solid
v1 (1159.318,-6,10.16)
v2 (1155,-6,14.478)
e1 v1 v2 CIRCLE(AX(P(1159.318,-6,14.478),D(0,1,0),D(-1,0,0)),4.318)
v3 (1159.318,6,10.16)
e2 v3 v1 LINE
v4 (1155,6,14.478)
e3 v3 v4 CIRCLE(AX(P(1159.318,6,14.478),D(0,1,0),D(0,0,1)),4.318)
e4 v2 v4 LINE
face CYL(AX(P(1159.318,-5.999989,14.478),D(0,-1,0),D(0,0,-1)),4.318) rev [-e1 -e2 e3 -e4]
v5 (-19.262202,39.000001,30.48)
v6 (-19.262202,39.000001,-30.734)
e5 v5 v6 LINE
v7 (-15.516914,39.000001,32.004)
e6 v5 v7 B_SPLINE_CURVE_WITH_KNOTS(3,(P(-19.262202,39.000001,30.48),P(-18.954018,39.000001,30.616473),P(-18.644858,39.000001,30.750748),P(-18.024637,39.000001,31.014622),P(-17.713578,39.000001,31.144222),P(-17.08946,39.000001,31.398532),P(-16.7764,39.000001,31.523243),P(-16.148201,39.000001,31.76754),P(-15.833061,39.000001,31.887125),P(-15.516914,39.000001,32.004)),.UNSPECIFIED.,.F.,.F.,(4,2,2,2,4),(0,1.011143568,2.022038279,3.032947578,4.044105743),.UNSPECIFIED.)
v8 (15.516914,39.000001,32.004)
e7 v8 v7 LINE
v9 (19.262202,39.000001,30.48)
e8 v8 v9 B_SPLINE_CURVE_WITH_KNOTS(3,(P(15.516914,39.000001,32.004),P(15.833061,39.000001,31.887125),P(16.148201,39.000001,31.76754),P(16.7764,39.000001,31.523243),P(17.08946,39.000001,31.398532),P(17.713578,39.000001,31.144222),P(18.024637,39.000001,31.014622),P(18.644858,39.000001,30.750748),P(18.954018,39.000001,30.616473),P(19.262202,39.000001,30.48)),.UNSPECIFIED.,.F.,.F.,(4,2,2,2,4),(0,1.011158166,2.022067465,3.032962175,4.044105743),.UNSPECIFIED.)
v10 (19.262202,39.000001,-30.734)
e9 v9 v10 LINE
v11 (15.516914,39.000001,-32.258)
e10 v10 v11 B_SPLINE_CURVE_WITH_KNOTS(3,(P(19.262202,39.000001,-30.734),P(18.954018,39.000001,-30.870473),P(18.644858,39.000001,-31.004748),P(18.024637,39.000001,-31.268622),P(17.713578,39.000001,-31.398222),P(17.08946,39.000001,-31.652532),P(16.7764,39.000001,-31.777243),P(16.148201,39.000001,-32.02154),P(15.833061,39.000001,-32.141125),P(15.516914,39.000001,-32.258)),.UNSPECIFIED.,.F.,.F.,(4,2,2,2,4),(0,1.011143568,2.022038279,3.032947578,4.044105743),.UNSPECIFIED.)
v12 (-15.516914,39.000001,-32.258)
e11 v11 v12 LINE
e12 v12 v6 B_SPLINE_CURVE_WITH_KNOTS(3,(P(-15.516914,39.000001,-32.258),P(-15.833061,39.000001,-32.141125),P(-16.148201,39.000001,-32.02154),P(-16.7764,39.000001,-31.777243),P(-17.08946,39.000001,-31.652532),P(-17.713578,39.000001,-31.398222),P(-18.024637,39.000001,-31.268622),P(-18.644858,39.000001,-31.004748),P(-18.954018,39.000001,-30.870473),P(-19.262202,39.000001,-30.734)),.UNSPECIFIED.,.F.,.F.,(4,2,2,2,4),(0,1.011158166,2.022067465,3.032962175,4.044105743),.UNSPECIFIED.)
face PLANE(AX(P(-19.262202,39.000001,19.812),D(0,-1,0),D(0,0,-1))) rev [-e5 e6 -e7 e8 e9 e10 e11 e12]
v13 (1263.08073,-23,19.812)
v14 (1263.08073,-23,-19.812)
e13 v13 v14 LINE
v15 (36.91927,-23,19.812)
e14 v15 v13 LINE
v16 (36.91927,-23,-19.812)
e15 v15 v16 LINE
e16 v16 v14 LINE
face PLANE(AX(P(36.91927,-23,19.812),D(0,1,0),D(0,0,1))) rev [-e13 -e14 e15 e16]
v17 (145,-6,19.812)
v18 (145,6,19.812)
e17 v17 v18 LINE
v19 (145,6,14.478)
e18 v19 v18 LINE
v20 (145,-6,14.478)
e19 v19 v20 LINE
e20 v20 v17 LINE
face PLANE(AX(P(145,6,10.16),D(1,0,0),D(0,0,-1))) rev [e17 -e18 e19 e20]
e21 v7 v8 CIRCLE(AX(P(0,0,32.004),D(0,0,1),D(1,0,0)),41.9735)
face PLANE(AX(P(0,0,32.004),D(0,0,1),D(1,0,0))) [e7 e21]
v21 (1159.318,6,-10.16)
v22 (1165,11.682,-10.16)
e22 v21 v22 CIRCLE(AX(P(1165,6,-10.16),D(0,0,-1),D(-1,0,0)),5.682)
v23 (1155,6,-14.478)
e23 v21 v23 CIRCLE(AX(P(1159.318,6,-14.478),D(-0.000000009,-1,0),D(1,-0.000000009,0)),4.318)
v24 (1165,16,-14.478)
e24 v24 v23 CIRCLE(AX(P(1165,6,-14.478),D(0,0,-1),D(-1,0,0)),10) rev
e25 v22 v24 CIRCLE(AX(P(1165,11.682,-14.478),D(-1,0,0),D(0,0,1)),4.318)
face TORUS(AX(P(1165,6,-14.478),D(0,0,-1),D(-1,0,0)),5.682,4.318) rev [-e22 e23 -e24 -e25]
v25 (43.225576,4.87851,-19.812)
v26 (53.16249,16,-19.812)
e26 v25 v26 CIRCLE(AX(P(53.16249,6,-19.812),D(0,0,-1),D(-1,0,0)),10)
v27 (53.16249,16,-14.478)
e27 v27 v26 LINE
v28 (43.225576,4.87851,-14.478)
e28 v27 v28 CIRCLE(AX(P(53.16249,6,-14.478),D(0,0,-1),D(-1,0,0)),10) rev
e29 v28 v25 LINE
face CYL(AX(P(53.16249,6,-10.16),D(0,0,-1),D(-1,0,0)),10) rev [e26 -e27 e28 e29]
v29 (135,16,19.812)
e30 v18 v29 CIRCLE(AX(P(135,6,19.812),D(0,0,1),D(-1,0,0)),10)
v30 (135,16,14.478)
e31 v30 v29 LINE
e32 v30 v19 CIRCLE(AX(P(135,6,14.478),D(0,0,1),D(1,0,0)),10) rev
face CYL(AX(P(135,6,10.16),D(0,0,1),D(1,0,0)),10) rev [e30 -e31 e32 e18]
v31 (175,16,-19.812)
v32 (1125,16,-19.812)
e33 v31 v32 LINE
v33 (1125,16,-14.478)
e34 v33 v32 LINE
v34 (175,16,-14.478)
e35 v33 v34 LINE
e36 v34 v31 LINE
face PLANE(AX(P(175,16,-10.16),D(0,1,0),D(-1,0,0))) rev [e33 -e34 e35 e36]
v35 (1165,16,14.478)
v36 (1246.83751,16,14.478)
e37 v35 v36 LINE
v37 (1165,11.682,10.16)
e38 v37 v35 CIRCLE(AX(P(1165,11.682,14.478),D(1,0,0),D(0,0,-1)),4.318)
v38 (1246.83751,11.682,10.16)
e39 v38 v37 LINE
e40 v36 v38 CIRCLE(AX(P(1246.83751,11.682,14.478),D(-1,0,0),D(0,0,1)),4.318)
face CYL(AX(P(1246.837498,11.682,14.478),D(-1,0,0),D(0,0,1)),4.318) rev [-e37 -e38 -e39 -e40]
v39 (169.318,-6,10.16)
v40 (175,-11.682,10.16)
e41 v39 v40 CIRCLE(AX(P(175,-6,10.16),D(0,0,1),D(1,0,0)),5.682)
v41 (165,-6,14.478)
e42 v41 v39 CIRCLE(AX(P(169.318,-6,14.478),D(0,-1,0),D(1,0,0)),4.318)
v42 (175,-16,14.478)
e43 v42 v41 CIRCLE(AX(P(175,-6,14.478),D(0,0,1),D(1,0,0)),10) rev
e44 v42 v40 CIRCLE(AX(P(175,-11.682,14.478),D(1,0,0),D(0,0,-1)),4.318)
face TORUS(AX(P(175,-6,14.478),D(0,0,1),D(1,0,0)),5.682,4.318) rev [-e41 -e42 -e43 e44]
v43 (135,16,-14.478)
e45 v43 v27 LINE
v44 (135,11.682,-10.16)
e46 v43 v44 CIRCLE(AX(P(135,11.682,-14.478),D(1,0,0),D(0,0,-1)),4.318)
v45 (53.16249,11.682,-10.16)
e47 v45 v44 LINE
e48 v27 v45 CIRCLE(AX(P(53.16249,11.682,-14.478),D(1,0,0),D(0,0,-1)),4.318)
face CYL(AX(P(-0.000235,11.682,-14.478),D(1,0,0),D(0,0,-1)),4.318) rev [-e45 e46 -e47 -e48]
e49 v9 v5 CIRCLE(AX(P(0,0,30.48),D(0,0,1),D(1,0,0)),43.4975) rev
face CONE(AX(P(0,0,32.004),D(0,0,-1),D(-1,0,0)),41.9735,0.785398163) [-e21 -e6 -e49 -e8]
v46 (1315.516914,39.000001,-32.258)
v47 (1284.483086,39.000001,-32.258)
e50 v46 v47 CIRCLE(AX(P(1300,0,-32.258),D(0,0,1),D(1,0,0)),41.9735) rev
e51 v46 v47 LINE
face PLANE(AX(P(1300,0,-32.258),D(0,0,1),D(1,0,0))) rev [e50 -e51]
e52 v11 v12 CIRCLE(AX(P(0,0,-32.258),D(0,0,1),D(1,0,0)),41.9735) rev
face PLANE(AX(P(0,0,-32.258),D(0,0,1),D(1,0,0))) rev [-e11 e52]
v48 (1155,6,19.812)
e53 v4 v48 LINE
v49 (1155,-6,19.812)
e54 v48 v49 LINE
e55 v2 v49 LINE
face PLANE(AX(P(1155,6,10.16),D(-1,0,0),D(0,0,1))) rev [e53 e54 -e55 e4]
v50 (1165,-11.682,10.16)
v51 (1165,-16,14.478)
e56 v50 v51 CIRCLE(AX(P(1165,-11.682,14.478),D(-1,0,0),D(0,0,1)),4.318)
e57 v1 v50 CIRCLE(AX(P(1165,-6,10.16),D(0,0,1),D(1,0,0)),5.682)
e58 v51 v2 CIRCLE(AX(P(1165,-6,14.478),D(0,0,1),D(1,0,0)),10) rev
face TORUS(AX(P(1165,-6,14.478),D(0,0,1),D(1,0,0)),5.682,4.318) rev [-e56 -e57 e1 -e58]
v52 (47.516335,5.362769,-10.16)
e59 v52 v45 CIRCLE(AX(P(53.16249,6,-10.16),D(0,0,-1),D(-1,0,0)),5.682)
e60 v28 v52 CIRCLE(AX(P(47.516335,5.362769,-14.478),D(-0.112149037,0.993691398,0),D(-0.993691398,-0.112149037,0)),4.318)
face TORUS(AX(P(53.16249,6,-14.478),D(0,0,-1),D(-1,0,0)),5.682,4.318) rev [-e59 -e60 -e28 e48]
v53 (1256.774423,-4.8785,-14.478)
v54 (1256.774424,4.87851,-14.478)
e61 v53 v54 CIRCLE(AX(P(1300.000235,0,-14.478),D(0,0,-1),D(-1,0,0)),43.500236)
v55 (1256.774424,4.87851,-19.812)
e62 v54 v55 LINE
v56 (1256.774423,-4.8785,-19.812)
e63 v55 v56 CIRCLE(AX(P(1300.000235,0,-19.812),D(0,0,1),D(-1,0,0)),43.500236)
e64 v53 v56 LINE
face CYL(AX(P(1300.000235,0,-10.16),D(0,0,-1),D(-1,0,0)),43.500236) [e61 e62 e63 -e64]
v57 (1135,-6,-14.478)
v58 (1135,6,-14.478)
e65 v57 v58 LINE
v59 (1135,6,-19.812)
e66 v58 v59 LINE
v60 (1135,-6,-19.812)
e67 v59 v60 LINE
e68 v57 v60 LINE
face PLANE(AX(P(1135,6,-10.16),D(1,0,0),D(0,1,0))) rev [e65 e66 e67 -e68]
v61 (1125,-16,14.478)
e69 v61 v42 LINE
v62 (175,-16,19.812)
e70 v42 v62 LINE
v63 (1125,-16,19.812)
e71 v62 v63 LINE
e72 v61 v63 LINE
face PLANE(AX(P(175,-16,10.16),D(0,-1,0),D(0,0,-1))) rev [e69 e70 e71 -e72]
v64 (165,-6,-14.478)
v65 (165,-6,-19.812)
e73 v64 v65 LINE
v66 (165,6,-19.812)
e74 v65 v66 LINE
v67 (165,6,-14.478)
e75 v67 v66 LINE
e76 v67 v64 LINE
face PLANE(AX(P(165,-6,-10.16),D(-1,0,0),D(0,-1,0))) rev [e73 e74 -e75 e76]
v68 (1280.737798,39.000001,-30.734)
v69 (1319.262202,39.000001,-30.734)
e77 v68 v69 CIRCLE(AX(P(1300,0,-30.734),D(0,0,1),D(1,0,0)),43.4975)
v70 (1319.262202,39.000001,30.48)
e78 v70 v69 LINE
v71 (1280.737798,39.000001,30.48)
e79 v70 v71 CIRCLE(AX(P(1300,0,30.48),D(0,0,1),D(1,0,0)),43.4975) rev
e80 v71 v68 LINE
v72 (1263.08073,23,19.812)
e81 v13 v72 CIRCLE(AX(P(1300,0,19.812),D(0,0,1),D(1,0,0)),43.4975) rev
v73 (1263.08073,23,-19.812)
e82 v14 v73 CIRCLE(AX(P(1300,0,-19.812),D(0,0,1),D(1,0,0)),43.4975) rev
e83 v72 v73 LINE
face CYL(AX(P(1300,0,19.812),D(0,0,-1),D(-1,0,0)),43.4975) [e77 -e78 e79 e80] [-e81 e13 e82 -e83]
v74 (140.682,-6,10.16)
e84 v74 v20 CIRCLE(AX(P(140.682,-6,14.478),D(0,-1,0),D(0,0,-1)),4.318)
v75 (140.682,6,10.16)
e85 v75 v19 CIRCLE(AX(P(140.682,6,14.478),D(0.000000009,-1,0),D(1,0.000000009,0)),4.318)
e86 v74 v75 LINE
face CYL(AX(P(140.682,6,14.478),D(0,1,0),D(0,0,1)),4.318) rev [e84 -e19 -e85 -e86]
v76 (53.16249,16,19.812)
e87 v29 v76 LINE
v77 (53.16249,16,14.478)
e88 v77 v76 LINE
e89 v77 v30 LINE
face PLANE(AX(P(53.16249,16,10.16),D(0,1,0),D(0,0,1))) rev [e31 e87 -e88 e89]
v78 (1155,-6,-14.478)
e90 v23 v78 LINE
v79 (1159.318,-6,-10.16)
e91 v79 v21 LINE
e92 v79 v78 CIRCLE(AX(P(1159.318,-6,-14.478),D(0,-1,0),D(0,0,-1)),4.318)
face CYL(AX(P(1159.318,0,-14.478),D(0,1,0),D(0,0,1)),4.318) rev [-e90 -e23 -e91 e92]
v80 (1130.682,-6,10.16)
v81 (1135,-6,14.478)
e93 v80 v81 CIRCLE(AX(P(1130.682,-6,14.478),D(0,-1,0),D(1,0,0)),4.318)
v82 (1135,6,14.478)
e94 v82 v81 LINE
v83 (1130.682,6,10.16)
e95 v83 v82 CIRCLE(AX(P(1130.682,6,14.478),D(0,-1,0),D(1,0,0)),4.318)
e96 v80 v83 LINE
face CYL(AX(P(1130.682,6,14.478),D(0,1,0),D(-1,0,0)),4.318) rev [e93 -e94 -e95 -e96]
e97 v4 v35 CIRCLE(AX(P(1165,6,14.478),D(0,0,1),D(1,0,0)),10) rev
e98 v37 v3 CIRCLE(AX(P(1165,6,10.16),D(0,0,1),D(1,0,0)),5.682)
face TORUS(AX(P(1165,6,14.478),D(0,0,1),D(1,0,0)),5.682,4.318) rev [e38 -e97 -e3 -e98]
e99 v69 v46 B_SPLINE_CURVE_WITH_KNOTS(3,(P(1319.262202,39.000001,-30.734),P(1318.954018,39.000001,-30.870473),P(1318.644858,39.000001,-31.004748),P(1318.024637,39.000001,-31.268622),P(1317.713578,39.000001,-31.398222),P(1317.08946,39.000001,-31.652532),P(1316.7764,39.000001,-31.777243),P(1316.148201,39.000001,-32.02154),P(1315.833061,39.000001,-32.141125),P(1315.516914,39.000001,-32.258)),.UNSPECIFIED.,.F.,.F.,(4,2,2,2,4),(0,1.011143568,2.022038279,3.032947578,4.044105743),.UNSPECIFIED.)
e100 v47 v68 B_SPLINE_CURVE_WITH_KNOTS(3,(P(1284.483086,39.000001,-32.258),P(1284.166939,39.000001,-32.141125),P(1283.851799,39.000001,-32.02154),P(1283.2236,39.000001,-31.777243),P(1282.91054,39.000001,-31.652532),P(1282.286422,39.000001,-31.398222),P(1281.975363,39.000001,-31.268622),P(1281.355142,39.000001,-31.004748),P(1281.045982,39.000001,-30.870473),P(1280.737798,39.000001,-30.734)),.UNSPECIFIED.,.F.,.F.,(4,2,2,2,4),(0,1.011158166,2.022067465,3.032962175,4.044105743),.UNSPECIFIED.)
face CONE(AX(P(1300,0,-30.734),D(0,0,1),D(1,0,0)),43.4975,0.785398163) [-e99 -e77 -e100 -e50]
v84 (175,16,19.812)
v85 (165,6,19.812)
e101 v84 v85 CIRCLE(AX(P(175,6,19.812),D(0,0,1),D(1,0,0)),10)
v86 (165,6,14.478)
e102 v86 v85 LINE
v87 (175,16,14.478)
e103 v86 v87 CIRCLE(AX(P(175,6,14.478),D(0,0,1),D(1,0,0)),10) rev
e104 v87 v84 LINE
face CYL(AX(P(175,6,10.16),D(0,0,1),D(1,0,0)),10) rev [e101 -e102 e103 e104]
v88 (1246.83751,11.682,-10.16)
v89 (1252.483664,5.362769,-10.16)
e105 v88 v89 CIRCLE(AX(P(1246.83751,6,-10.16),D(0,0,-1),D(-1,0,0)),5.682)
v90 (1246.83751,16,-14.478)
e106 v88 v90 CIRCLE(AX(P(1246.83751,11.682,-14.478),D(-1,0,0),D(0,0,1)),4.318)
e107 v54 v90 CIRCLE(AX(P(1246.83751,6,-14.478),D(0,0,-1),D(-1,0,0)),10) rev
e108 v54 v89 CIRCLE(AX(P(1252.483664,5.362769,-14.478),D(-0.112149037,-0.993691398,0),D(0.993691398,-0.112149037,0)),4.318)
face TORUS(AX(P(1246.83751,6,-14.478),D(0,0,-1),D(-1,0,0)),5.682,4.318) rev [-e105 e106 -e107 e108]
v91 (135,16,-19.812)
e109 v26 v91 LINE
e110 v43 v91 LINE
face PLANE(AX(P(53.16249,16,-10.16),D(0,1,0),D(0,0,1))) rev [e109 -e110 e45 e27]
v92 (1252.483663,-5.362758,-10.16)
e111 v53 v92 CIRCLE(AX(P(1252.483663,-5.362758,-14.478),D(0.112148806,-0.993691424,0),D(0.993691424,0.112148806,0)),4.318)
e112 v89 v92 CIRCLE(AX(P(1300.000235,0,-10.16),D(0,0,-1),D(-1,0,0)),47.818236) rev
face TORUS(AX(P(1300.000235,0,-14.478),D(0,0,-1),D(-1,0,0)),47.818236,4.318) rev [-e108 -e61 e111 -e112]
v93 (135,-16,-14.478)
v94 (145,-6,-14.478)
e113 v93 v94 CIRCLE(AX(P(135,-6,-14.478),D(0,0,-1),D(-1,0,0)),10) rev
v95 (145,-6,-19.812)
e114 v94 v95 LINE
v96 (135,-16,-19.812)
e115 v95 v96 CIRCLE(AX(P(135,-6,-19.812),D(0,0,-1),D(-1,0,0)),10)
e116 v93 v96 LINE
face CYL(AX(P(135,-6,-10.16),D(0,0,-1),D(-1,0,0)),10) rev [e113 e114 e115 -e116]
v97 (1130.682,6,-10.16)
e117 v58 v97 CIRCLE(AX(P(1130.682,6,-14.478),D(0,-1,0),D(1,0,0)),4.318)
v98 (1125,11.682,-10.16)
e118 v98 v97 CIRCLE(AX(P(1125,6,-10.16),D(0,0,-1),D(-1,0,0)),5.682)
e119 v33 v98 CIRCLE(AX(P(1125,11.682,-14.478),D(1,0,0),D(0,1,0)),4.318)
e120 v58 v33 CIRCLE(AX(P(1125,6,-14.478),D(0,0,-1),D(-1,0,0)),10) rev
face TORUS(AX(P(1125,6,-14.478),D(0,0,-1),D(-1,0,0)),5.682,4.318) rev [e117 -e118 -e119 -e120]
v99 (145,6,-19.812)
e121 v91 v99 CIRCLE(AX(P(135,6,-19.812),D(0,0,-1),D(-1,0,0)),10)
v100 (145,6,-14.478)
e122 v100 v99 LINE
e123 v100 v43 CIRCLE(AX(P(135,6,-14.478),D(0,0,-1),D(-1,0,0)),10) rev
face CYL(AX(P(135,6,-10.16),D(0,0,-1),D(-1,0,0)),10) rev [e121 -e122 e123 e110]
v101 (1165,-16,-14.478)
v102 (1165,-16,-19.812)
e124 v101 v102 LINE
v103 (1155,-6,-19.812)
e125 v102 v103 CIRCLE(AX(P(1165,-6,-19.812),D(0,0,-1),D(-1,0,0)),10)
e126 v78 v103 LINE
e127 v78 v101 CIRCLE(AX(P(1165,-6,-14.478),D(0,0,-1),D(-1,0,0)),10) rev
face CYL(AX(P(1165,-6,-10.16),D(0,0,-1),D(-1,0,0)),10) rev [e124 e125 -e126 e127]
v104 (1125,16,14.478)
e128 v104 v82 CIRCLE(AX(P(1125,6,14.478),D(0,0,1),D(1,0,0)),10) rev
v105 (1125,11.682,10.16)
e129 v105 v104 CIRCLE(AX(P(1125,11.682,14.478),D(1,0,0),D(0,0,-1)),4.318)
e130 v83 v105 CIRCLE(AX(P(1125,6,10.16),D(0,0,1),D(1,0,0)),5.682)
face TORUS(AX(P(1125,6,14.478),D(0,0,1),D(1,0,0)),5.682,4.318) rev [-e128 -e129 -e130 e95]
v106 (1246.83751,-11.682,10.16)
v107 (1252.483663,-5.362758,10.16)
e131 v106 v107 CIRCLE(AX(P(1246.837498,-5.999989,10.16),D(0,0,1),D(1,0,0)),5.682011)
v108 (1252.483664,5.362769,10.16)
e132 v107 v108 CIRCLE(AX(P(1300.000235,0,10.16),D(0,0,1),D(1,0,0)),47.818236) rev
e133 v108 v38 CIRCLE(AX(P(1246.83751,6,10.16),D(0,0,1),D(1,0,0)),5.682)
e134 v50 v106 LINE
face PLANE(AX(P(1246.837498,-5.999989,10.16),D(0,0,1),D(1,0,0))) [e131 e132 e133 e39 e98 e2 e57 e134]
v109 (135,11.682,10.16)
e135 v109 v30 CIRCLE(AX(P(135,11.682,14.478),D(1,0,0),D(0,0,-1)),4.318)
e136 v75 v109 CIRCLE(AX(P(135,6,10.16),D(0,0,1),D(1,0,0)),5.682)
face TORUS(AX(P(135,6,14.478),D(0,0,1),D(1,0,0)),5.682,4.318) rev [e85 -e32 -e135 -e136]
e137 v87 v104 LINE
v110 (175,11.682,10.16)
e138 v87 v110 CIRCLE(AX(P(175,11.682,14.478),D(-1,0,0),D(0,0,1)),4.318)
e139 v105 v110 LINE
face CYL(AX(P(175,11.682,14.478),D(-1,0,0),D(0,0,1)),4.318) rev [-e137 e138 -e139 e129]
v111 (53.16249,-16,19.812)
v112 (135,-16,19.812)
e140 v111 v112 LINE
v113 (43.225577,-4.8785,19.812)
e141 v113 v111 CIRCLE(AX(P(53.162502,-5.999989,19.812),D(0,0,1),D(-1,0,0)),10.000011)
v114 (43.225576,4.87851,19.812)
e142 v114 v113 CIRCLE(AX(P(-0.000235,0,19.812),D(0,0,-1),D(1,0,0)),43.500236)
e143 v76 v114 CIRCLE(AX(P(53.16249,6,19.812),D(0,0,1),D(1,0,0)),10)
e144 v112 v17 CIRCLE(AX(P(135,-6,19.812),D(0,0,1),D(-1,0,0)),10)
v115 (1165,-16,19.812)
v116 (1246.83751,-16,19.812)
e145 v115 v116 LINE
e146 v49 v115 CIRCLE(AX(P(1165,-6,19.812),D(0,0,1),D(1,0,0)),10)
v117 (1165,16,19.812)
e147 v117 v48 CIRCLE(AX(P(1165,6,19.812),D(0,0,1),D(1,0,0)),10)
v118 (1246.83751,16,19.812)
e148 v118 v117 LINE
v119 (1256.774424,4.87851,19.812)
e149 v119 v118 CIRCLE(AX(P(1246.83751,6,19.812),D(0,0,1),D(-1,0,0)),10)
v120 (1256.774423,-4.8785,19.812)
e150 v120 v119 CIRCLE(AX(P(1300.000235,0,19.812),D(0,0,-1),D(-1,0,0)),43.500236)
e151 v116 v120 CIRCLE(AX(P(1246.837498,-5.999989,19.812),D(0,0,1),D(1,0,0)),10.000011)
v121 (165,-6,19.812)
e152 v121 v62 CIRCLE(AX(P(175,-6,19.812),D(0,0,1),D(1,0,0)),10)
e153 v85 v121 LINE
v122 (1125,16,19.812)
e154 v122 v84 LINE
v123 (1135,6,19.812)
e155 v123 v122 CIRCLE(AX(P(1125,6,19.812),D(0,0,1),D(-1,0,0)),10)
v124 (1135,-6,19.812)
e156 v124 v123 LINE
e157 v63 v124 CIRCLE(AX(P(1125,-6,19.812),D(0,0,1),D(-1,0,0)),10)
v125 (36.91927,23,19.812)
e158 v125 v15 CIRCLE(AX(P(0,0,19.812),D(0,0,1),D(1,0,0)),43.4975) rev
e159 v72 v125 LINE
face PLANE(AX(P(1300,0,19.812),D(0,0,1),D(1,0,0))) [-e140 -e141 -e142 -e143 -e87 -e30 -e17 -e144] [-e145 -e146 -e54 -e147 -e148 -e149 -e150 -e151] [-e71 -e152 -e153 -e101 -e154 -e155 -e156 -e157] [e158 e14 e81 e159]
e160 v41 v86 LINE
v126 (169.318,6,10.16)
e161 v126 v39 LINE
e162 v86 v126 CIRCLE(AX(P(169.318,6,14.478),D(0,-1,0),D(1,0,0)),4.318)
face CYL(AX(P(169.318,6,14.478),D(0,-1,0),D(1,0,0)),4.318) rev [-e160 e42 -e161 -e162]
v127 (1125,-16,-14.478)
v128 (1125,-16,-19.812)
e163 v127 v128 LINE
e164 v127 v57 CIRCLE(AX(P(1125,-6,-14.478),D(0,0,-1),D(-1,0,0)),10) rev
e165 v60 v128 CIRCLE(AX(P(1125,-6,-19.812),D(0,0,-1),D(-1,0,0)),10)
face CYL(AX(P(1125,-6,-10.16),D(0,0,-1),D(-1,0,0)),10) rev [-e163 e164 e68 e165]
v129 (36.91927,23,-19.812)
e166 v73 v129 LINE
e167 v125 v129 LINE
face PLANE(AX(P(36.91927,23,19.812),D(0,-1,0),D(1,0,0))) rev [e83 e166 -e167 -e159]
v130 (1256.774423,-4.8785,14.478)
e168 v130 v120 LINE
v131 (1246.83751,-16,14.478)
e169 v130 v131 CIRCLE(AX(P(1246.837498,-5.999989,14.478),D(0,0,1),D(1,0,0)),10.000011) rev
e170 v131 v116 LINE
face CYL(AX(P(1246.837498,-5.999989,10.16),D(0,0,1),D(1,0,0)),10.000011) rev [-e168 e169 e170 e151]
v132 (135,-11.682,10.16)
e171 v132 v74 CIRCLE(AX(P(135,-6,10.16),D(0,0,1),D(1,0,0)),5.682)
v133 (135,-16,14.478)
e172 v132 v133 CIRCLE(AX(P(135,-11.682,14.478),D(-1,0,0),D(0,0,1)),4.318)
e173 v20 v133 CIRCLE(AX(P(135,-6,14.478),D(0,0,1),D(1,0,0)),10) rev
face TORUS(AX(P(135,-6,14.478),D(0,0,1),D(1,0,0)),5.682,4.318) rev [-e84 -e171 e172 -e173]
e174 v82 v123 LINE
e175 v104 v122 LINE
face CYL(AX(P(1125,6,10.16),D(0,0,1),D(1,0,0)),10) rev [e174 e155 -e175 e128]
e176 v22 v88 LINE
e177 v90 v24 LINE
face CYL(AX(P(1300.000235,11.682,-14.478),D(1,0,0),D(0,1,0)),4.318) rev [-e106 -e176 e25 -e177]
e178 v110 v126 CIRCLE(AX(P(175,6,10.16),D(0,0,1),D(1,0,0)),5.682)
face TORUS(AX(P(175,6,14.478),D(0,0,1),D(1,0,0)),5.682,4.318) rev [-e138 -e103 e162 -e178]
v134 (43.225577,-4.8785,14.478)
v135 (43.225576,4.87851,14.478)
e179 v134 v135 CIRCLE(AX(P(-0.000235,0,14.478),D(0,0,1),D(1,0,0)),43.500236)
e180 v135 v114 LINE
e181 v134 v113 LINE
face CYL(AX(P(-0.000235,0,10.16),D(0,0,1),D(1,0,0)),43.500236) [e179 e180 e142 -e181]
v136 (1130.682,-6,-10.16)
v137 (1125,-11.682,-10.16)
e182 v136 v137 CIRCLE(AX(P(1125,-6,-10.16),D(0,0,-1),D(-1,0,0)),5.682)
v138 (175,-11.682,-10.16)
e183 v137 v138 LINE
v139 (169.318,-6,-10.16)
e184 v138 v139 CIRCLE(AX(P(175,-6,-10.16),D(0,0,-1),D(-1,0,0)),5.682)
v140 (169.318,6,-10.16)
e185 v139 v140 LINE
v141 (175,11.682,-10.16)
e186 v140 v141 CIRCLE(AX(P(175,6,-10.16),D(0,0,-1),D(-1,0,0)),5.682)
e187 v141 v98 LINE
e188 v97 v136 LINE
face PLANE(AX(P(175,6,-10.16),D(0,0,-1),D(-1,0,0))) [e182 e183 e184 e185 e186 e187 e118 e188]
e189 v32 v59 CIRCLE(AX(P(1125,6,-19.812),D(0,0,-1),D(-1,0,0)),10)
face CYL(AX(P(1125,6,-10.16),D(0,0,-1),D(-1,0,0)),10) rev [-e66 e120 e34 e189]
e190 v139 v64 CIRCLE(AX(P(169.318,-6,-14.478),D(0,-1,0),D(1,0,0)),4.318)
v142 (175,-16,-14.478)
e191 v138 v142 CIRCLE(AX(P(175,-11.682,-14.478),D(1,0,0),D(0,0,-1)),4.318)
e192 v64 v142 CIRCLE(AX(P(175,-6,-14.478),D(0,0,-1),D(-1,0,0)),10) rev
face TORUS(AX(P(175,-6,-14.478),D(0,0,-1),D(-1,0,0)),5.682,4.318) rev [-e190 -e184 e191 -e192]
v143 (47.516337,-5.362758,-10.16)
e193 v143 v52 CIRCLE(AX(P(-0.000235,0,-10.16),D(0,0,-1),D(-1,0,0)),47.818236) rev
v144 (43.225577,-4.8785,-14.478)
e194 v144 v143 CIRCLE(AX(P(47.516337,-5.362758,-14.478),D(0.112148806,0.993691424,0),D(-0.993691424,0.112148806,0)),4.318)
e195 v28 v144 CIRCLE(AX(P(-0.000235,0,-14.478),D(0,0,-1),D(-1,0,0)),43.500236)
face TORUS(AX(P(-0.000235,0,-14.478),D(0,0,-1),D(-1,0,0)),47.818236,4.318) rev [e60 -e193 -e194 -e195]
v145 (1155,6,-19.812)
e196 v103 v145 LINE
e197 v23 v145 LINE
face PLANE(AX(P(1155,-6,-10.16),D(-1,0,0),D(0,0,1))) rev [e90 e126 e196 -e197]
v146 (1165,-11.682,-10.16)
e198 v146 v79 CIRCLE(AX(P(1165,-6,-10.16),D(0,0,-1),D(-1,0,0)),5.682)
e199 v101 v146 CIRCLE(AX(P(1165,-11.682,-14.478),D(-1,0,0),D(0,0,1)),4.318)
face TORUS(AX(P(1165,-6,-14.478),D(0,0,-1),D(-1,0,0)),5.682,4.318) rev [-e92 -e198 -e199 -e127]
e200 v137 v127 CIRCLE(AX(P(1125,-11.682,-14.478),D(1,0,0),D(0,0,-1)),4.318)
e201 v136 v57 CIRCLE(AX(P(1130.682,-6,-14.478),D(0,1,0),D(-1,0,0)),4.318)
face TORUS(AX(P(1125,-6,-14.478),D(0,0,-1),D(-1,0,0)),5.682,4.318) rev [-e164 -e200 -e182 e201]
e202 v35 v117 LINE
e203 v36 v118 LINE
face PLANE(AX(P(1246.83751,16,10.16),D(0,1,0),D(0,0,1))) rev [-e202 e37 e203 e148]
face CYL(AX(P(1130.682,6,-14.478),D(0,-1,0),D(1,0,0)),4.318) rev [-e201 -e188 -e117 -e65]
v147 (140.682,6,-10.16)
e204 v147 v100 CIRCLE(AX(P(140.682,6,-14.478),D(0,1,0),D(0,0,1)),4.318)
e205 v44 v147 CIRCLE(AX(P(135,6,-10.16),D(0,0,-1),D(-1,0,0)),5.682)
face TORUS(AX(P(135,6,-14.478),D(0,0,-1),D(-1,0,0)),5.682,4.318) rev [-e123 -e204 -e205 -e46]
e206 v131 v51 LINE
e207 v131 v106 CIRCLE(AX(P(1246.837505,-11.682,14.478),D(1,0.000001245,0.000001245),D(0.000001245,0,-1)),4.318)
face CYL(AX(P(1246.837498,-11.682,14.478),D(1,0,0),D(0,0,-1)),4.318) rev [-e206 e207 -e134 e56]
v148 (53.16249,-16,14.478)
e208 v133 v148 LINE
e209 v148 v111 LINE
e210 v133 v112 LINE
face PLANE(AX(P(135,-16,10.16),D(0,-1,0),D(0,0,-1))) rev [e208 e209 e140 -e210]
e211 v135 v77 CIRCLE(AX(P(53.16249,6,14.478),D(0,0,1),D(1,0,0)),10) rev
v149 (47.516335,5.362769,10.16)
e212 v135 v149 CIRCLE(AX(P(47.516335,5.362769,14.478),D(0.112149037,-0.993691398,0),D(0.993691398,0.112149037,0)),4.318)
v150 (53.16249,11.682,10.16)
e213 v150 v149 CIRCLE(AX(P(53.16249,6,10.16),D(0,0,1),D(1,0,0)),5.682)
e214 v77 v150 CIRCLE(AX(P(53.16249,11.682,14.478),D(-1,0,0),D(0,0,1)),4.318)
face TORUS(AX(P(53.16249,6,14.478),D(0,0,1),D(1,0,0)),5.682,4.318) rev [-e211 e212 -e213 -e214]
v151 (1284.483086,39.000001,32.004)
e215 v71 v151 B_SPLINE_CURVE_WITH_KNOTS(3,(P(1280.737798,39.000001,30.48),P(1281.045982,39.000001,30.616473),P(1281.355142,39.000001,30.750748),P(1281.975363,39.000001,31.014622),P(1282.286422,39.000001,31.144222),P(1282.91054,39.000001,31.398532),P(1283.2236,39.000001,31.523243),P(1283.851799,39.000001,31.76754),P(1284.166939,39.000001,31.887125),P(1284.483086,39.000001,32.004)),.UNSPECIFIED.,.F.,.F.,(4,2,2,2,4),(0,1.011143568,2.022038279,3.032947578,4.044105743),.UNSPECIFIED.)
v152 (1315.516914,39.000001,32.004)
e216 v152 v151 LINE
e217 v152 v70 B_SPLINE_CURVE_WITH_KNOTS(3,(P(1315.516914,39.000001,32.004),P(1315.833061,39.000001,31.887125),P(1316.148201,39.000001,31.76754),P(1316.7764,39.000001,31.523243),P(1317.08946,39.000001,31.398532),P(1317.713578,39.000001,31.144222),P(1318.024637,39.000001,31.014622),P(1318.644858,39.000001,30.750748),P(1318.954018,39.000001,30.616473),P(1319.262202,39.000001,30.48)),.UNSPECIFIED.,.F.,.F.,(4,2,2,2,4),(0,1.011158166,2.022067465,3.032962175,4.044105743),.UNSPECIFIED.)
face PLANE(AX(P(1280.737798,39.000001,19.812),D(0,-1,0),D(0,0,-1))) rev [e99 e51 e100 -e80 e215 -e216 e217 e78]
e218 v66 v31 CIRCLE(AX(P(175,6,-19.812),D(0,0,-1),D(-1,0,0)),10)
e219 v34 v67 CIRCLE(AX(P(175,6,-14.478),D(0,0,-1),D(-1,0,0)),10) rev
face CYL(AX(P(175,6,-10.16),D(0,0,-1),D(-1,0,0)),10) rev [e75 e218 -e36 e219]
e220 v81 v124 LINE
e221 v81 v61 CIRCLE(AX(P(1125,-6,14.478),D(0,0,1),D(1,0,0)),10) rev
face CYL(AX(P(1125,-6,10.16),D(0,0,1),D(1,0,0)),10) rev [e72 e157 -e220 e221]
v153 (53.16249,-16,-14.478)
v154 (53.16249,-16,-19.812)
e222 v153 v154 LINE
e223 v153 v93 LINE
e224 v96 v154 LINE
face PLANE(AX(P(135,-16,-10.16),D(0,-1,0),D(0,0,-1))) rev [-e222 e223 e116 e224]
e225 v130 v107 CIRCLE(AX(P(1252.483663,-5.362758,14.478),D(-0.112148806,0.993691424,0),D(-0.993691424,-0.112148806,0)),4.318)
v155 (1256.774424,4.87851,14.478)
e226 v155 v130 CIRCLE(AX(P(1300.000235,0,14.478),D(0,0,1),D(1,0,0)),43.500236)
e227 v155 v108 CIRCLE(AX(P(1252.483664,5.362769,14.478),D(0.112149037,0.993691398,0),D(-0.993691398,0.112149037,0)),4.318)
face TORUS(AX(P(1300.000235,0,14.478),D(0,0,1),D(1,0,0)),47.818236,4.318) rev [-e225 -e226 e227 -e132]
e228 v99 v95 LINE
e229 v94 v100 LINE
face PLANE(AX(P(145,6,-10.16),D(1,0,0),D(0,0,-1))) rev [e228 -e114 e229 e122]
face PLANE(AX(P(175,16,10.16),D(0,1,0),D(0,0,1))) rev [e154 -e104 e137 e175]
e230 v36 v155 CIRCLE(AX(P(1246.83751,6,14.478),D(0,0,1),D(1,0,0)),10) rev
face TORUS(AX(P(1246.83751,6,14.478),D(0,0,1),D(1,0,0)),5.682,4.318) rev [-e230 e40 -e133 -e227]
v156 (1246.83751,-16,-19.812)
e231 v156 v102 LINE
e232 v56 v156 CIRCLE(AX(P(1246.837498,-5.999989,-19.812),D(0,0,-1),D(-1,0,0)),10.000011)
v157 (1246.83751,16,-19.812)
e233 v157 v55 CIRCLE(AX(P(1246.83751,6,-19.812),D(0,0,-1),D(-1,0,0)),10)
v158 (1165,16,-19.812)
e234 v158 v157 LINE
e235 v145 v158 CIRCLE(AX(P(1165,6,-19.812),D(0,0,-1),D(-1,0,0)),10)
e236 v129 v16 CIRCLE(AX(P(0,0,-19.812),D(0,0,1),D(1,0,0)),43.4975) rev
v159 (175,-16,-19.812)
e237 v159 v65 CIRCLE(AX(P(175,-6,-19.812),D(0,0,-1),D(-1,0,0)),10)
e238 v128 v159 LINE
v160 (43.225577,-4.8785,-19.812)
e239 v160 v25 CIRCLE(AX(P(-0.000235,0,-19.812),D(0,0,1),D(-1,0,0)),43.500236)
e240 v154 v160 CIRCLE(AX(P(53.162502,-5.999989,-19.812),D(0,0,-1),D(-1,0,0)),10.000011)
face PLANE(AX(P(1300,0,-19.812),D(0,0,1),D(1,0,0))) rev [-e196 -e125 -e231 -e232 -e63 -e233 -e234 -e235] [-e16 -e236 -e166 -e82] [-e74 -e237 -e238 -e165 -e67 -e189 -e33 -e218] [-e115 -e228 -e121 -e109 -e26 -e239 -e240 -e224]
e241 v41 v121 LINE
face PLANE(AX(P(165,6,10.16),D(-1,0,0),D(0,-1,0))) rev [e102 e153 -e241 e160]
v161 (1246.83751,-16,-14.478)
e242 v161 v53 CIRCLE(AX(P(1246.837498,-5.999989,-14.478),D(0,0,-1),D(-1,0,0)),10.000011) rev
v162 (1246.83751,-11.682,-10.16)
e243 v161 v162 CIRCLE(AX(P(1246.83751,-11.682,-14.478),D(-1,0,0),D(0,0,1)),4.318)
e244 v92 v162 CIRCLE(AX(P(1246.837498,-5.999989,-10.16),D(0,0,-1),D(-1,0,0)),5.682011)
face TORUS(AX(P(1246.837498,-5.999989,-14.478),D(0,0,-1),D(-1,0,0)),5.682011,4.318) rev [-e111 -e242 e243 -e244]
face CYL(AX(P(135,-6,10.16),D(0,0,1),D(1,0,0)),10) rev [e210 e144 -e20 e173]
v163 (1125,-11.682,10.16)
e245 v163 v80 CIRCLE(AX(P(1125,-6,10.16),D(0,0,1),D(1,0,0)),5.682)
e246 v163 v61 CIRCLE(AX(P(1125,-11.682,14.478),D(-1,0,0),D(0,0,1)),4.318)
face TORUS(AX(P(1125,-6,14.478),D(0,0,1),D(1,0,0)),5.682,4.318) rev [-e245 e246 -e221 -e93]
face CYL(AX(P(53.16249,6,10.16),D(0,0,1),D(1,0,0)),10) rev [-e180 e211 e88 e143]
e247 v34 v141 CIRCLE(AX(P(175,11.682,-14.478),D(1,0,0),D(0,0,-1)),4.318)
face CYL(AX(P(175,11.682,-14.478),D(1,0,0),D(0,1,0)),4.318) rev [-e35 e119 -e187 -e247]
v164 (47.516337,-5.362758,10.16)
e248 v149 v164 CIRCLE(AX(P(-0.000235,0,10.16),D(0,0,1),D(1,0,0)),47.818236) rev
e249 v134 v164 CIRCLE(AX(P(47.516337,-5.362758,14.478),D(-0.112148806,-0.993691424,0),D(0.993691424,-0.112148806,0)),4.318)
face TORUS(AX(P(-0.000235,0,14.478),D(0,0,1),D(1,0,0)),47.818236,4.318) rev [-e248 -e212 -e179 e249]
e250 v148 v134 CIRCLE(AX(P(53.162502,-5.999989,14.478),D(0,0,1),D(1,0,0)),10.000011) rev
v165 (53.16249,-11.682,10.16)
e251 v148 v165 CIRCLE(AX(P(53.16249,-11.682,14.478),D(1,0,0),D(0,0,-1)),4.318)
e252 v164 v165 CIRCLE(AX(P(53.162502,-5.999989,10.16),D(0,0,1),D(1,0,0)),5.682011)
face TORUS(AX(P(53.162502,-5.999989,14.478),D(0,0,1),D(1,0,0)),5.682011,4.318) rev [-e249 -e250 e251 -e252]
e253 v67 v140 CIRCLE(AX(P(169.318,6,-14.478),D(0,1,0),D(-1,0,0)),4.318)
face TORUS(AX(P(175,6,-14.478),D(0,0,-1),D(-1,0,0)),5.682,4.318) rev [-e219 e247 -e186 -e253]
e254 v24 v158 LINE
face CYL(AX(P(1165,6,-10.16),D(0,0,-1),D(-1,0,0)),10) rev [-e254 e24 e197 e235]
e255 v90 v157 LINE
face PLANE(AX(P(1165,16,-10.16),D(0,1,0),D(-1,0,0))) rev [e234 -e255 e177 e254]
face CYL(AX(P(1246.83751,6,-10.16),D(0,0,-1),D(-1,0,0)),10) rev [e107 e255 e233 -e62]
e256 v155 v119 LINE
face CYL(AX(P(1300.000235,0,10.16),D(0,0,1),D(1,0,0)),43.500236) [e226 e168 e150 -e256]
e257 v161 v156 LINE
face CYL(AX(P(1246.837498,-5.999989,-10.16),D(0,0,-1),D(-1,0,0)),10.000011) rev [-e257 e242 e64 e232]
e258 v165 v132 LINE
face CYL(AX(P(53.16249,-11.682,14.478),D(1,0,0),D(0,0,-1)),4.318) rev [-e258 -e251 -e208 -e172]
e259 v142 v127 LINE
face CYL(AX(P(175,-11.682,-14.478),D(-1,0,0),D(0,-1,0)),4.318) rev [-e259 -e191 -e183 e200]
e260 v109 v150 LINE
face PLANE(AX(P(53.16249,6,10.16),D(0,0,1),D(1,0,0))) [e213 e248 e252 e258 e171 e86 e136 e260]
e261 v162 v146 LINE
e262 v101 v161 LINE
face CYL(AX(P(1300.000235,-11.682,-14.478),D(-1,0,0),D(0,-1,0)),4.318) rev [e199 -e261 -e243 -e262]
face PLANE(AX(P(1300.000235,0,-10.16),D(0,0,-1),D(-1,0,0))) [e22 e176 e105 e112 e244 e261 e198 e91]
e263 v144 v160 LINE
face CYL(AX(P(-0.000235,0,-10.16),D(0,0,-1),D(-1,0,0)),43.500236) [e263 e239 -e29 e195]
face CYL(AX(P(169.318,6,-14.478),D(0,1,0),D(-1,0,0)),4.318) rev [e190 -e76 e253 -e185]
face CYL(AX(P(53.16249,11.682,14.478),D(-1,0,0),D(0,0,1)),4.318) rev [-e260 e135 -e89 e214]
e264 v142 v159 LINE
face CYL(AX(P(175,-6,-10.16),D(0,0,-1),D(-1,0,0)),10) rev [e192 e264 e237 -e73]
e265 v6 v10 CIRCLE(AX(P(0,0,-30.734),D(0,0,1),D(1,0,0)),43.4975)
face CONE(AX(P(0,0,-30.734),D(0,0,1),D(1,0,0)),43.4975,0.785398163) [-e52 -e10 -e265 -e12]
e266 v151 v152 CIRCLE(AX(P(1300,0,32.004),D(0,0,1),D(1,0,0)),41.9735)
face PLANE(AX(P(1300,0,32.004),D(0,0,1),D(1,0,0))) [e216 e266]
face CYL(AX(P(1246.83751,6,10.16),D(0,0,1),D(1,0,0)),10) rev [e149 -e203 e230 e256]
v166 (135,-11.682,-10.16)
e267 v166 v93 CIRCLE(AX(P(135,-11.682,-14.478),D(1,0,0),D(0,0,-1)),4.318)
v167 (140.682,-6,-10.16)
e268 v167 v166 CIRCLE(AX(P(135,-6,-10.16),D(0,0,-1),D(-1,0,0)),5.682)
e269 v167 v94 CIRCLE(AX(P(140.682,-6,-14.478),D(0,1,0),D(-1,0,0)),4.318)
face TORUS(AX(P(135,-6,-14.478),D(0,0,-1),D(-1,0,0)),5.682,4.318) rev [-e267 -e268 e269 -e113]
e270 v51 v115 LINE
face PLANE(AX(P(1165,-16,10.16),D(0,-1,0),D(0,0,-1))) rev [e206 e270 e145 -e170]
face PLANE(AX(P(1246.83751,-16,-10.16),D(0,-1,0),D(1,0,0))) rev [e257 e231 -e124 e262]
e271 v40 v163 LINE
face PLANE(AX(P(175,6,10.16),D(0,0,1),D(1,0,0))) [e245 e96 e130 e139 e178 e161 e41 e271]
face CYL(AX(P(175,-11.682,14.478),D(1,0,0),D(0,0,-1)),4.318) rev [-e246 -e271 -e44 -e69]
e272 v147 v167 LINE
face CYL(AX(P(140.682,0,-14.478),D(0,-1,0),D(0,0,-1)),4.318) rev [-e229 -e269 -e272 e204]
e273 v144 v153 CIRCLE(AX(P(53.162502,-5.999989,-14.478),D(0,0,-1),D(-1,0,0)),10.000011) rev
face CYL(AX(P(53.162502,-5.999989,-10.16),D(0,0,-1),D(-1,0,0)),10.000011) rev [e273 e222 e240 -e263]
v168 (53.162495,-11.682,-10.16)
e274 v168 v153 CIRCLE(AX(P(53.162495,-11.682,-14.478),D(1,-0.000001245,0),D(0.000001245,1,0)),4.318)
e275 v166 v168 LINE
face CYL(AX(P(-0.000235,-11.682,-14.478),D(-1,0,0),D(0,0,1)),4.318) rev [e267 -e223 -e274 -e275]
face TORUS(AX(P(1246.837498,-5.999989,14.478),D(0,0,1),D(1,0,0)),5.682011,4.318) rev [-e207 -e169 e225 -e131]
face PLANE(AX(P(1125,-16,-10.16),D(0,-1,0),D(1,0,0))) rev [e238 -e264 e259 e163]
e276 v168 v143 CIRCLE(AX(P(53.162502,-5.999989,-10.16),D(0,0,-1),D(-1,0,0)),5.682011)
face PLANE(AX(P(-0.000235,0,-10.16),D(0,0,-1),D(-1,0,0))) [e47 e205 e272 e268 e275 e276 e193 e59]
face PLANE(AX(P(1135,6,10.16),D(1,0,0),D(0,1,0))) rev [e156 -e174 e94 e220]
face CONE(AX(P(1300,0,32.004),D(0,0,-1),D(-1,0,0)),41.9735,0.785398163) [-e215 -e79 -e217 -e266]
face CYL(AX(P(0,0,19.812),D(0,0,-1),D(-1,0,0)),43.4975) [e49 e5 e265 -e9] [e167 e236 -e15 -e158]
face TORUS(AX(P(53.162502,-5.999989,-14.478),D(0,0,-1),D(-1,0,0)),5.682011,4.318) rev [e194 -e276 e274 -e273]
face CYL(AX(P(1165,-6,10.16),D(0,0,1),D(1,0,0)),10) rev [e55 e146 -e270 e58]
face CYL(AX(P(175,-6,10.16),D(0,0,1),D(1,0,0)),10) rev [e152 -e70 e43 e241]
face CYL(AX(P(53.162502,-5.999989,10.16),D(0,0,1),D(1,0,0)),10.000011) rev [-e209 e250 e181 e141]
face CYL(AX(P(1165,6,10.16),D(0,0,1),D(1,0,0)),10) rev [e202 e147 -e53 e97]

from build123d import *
from build123d.topology import SkipClean

# Parameters (mm, degrees)
EXTRUDE1_DEPTH      = 19.812
EXTRUDE1_DEPTH_BACK = 19.812
CUT_EXTRUDE1_DEPTH  = 9.652
CUT_EXTRUDE2_START  = -9.652
CUT_EXTRUDE2_DEPTH  = 9.652
EXTRUDE2_DEPTH      = 12.192
EXTRUDE2_DEPTH_BACK = 52.07
CHAMFER1_SIZE       = 1.524
FILLET1_R           = 4.318


with BuildPart() as part:
    # Sketch3 → Extrude1 (new, two sides: drawn at the far end of the back side and taken through both)
    with BuildSketch(Plane.XY.offset(-EXTRUDE1_DEPTH_BACK)):
        with BuildLine():
            Line((-19.262201877, 39.000001091), (19.262201877, 39.000001091))
            ThreePointArc((19.262201877, 39.000001091), (29.207695203, 32.232639469), (36.919270155, 22.999999944))
            Line((36.919270155, 22.999999944), (1263.080729845, 22.999999944))
            ThreePointArc((1263.080729845, 22.999999944), (1270.792304797, 32.232639469), (1280.737798123, 39.000001091))
            Line((1280.737798123, 39.000001091), (1319.262201877, 39.000001091))
            ThreePointArc((1319.262201877, 39.000001091), (1332.232639491, -29.207695179), (1263.080729879, -23))
            Line((1263.080729879, -23), (36.919270121, -23))
            ThreePointArc((36.919270121, -23), (-32.232639491, -29.207695179), (-19.262201877, 39.000001091))
        make_face()
    extrude(amount=EXTRUDE1_DEPTH + EXTRUDE1_DEPTH_BACK)

    # Sketch4 → Cut-Extrude1 (cut)
    with BuildSketch(Plane.XY.offset(19.812)):
        with BuildLine():
            Line((53.16249, 15.999999944), (134.999999965, 15.999999944))
            ThreePointArc((134.999999965, 15.999999944), (142.07106777, 13.071067778), (145, 6))
            Line((145, 6), (145, -6))
            ThreePointArc((145, -6), (142.071067812, -13.071067812), (135, -16))
            Line((135, -16), (53.16249, -16))
            ThreePointArc((53.16249, -16), (45.705450362, -12.662765822), (43.22557716, -4.878499573))
            ThreePointArc((43.22557716, -4.878499573), (43.500001722, 5.034e-06), (43.225576025, 4.878509576))
            ThreePointArc((43.225576025, 4.878509576), (45.705449579, 12.662773253), (53.16249, 15.999999944))
        make_face()
        with BuildLine():
            Line((165, 6), (165, -6))
            ThreePointArc((165, -6), (167.928932188, -13.071067812), (175, -16))
            Line((175, -16), (1124.999999965, -16))
            ThreePointArc((1124.999999965, -16), (1132.071067777, -13.071067812), (1134.999999965, -6))
            Line((1134.999999965, -6), (1134.999999965, 6))
            ThreePointArc((1134.999999965, 6), (1132.071067777, 13.071067812), (1124.999999965, 16))
            Line((1124.999999965, 16), (175, 16))
            ThreePointArc((175, 16), (167.928932188, 13.071067812), (165, 6))
        make_face()
        with BuildLine():
            Line((1164.999999965, -16), (1246.837509965, -16))
            ThreePointArc((1246.837509965, -16), (1254.294549604, -12.662765822), (1256.774422805, -4.878499573))
            ThreePointArc((1256.774422805, -4.878499573), (1256.499998243, 5.034e-06), (1256.774423941, 4.878509576))
            ThreePointArc((1256.774423941, 4.878509576), (1254.294550386, 12.662773253), (1246.837509965, 15.999999944))
            Line((1246.837509965, 15.999999944), (1165, 15.999999944))
            ThreePointArc((1165, 15.999999944), (1157.928932195, 13.071067778), (1154.999999965, 6))
            Line((1154.999999965, 6), (1154.999999965, -6))
            ThreePointArc((1154.999999965, -6), (1157.928932153, -13.071067812), (1164.999999965, -16))
        make_face()
    extrude(amount=-CUT_EXTRUDE1_DEPTH, mode=Mode.SUBTRACT)

    # Sketch5 → Cut-Extrude2 (cut)
    with BuildSketch(Plane(origin=(0, 0, -19.812), x_dir=(-1, 0, 0), z_dir=(0, 0, -1)).offset(CUT_EXTRUDE2_START)):
        with BuildLine():
            Line((-165, -6), (-165, 6))
            ThreePointArc((-165, 6), (-167.928932188, 13.071067812), (-175, 16))
            Line((-175, 16), (-1124.999999965, 16))
            ThreePointArc((-1124.999999965, 16), (-1132.071067777, 13.071067812), (-1134.999999965, 6))
            Line((-1134.999999965, 6), (-1134.999999965, -6))
            ThreePointArc((-1134.999999965, -6), (-1132.071067777, -13.071067812), (-1124.999999965, -16))
            Line((-1124.999999965, -16), (-175, -16))
            ThreePointArc((-175, -16), (-167.928932188, -13.071067812), (-165, -6))
        make_face()
        with BuildLine():
            Line((-1165, 15.999999944), (-1246.837509965, 15.999999944))
            ThreePointArc((-1246.837509965, 15.999999944), (-1254.294550386, 12.662773253), (-1256.774423941, 4.878509576))
            ThreePointArc((-1256.774423941, 4.878509576), (-1256.499998243, 5.034e-06), (-1256.774422805, -4.878499573))
            ThreePointArc((-1256.774422805, -4.878499573), (-1254.294549604, -12.662765822), (-1246.837509965, -16))
            Line((-1246.837509965, -16), (-1164.999999965, -16))
            ThreePointArc((-1164.999999965, -16), (-1157.928932153, -13.071067812), (-1154.999999965, -6))
            Line((-1154.999999965, -6), (-1154.999999965, 6))
            ThreePointArc((-1154.999999965, 6), (-1157.928932195, 13.071067778), (-1165, 15.999999944))
        make_face()
        with BuildLine():
            Line((-135, -16), (-53.16249, -16))
            ThreePointArc((-53.16249, -16), (-45.705450362, -12.662765822), (-43.22557716, -4.878499573))
            ThreePointArc((-43.22557716, -4.878499573), (-43.500001722, 5.034e-06), (-43.225576025, 4.878509576))
            ThreePointArc((-43.225576025, 4.878509576), (-45.705449579, 12.662773253), (-53.16249, 15.999999944))
            Line((-53.16249, 15.999999944), (-134.999999965, 15.999999944))
            ThreePointArc((-134.999999965, 15.999999944), (-142.07106777, 13.071067778), (-145, 6))
            Line((-145, 6), (-145, -6))
            ThreePointArc((-145, -6), (-142.071067812, -13.071067812), (-135, -16))
        make_face()
    extrude(amount=CUT_EXTRUDE2_DEPTH, mode=Mode.SUBTRACT)

    # Sketch6 → Extrude2 (add, two sides: drawn at the far end of the back side and taken through both)
    with SkipClean():  # the faces are left unmerged after this step: merging them gives an invalid solid
        with BuildSketch(Plane.XY.offset(19.812).offset(-EXTRUDE2_DEPTH_BACK)):
            with BuildLine():
                Line((1319.262201877, 39.000001091), (1280.737798123, 39.000001091))
                ThreePointArc((1280.737798123, 39.000001091), (1258.165929163, 11.913984366), (1263.080729879, -23))
                ThreePointArc((1263.080729879, -23), (1332.232639491, -29.207695179), (1319.262201877, 39.000001091))
            make_face()
            with BuildLine():
                Line((19.262201877, 39.000001091), (-19.262201877, 39.000001091))
                ThreePointArc((-19.262201877, 39.000001091), (-32.232639491, -29.207695179), (36.919270121, -23))
                ThreePointArc((36.919270121, -23), (41.834070837, 11.913984366), (19.262201877, 39.000001091))
            make_face()
        extrude(amount=EXTRUDE2_DEPTH + EXTRUDE2_DEPTH_BACK)
    add(part.part.scale(1), mode=Mode.REPLACE)  # the faces are merged on a copy

    # Chamfer1
    chamfer1_edges = [part.edges().sort_by_distance(p)[0] for p in [
        (0, -43.4975, -32.258),
        (0, -43.4975, 32.004),
        (1300, -43.4975, 32.004),
        (1300, -43.4975, -32.258),
    ]]
    chamfer(chamfer1_edges, length=CHAMFER1_SIZE)

    # Fillet1
    fillet1_edges = [part.edges().sort_by_distance(p)[0] for p in [
        (1157.928932153, -13.071067812, 10.16),
        (1154.999999965, 0, 10.16),
        (1205.918754965, -16, 10.16),
        (1157.928932195, 13.071067778, 10.16),
        (1254.294549604, -12.662765822, 10.16),
        (1205.918754983, 15.999999944, 10.16),
        (1256.499998243, 5.034e-06, 10.16),
        (1254.294550386, 12.662773253, 10.16),
        (43.500001722, 5.034e-06, 10.16),
        (45.705450362, -12.662765822, 10.16),
        (45.705449579, 12.662773253, 10.16),
        (94.081245, -16, 10.16),
        (94.081244983, 15.999999944, 10.16),
        (142.071067812, -13.071067812, 10.16),
        (142.07106777, 13.071067778, 10.16),
        (145, 0, 10.16),
        (1132.071067777, 13.071067812, 10.16),
        (1134.999999965, 0, 10.16),
        (649.999999983, 16, 10.16),
        (1132.071067777, -13.071067812, 10.16),
        (167.928932188, 13.071067812, 10.16),
        (649.999999983, -16, 10.16),
        (165, 0, 10.16),
        (167.928932188, -13.071067812, 10.16),
        (1205.918754983, 15.999999944, -10.16),
        (1157.928932195, 13.071067778, -10.16),
        (1254.294550386, 12.662773253, -10.16),
        (1154.999999965, 0, -10.16),
        (1256.499998243, 5.034e-06, -10.16),
        (1157.928932153, -13.071067812, -10.16),
        (1254.294549604, -12.662765822, -10.16),
        (1205.918754965, -16, -10.16),
        (94.081245, -16, -10.16),
        (142.071067812, -13.071067812, -10.16),
        (45.705450362, -12.662765822, -10.16),
        (145, 0, -10.16),
        (43.500001722, 5.034e-06, -10.16),
        (142.07106777, 13.071067778, -10.16),
        (45.705449579, 12.662773253, -10.16),
        (94.081244983, 15.999999944, -10.16),
        (1132.071067777, 13.071067812, -10.16),
        (649.999999983, 16, -10.16),
        (1134.999999965, 0, -10.16),
        (167.928932188, 13.071067812, -10.16),
        (1132.071067777, -13.071067812, -10.16),
        (165, 0, -10.16),
        (649.999999983, -16, -10.16),
        (167.928932188, -13.071067812, -10.16),
    ]]
    fillet(fillet1_edges, radius=FILLET1_R)


solid = part.part
